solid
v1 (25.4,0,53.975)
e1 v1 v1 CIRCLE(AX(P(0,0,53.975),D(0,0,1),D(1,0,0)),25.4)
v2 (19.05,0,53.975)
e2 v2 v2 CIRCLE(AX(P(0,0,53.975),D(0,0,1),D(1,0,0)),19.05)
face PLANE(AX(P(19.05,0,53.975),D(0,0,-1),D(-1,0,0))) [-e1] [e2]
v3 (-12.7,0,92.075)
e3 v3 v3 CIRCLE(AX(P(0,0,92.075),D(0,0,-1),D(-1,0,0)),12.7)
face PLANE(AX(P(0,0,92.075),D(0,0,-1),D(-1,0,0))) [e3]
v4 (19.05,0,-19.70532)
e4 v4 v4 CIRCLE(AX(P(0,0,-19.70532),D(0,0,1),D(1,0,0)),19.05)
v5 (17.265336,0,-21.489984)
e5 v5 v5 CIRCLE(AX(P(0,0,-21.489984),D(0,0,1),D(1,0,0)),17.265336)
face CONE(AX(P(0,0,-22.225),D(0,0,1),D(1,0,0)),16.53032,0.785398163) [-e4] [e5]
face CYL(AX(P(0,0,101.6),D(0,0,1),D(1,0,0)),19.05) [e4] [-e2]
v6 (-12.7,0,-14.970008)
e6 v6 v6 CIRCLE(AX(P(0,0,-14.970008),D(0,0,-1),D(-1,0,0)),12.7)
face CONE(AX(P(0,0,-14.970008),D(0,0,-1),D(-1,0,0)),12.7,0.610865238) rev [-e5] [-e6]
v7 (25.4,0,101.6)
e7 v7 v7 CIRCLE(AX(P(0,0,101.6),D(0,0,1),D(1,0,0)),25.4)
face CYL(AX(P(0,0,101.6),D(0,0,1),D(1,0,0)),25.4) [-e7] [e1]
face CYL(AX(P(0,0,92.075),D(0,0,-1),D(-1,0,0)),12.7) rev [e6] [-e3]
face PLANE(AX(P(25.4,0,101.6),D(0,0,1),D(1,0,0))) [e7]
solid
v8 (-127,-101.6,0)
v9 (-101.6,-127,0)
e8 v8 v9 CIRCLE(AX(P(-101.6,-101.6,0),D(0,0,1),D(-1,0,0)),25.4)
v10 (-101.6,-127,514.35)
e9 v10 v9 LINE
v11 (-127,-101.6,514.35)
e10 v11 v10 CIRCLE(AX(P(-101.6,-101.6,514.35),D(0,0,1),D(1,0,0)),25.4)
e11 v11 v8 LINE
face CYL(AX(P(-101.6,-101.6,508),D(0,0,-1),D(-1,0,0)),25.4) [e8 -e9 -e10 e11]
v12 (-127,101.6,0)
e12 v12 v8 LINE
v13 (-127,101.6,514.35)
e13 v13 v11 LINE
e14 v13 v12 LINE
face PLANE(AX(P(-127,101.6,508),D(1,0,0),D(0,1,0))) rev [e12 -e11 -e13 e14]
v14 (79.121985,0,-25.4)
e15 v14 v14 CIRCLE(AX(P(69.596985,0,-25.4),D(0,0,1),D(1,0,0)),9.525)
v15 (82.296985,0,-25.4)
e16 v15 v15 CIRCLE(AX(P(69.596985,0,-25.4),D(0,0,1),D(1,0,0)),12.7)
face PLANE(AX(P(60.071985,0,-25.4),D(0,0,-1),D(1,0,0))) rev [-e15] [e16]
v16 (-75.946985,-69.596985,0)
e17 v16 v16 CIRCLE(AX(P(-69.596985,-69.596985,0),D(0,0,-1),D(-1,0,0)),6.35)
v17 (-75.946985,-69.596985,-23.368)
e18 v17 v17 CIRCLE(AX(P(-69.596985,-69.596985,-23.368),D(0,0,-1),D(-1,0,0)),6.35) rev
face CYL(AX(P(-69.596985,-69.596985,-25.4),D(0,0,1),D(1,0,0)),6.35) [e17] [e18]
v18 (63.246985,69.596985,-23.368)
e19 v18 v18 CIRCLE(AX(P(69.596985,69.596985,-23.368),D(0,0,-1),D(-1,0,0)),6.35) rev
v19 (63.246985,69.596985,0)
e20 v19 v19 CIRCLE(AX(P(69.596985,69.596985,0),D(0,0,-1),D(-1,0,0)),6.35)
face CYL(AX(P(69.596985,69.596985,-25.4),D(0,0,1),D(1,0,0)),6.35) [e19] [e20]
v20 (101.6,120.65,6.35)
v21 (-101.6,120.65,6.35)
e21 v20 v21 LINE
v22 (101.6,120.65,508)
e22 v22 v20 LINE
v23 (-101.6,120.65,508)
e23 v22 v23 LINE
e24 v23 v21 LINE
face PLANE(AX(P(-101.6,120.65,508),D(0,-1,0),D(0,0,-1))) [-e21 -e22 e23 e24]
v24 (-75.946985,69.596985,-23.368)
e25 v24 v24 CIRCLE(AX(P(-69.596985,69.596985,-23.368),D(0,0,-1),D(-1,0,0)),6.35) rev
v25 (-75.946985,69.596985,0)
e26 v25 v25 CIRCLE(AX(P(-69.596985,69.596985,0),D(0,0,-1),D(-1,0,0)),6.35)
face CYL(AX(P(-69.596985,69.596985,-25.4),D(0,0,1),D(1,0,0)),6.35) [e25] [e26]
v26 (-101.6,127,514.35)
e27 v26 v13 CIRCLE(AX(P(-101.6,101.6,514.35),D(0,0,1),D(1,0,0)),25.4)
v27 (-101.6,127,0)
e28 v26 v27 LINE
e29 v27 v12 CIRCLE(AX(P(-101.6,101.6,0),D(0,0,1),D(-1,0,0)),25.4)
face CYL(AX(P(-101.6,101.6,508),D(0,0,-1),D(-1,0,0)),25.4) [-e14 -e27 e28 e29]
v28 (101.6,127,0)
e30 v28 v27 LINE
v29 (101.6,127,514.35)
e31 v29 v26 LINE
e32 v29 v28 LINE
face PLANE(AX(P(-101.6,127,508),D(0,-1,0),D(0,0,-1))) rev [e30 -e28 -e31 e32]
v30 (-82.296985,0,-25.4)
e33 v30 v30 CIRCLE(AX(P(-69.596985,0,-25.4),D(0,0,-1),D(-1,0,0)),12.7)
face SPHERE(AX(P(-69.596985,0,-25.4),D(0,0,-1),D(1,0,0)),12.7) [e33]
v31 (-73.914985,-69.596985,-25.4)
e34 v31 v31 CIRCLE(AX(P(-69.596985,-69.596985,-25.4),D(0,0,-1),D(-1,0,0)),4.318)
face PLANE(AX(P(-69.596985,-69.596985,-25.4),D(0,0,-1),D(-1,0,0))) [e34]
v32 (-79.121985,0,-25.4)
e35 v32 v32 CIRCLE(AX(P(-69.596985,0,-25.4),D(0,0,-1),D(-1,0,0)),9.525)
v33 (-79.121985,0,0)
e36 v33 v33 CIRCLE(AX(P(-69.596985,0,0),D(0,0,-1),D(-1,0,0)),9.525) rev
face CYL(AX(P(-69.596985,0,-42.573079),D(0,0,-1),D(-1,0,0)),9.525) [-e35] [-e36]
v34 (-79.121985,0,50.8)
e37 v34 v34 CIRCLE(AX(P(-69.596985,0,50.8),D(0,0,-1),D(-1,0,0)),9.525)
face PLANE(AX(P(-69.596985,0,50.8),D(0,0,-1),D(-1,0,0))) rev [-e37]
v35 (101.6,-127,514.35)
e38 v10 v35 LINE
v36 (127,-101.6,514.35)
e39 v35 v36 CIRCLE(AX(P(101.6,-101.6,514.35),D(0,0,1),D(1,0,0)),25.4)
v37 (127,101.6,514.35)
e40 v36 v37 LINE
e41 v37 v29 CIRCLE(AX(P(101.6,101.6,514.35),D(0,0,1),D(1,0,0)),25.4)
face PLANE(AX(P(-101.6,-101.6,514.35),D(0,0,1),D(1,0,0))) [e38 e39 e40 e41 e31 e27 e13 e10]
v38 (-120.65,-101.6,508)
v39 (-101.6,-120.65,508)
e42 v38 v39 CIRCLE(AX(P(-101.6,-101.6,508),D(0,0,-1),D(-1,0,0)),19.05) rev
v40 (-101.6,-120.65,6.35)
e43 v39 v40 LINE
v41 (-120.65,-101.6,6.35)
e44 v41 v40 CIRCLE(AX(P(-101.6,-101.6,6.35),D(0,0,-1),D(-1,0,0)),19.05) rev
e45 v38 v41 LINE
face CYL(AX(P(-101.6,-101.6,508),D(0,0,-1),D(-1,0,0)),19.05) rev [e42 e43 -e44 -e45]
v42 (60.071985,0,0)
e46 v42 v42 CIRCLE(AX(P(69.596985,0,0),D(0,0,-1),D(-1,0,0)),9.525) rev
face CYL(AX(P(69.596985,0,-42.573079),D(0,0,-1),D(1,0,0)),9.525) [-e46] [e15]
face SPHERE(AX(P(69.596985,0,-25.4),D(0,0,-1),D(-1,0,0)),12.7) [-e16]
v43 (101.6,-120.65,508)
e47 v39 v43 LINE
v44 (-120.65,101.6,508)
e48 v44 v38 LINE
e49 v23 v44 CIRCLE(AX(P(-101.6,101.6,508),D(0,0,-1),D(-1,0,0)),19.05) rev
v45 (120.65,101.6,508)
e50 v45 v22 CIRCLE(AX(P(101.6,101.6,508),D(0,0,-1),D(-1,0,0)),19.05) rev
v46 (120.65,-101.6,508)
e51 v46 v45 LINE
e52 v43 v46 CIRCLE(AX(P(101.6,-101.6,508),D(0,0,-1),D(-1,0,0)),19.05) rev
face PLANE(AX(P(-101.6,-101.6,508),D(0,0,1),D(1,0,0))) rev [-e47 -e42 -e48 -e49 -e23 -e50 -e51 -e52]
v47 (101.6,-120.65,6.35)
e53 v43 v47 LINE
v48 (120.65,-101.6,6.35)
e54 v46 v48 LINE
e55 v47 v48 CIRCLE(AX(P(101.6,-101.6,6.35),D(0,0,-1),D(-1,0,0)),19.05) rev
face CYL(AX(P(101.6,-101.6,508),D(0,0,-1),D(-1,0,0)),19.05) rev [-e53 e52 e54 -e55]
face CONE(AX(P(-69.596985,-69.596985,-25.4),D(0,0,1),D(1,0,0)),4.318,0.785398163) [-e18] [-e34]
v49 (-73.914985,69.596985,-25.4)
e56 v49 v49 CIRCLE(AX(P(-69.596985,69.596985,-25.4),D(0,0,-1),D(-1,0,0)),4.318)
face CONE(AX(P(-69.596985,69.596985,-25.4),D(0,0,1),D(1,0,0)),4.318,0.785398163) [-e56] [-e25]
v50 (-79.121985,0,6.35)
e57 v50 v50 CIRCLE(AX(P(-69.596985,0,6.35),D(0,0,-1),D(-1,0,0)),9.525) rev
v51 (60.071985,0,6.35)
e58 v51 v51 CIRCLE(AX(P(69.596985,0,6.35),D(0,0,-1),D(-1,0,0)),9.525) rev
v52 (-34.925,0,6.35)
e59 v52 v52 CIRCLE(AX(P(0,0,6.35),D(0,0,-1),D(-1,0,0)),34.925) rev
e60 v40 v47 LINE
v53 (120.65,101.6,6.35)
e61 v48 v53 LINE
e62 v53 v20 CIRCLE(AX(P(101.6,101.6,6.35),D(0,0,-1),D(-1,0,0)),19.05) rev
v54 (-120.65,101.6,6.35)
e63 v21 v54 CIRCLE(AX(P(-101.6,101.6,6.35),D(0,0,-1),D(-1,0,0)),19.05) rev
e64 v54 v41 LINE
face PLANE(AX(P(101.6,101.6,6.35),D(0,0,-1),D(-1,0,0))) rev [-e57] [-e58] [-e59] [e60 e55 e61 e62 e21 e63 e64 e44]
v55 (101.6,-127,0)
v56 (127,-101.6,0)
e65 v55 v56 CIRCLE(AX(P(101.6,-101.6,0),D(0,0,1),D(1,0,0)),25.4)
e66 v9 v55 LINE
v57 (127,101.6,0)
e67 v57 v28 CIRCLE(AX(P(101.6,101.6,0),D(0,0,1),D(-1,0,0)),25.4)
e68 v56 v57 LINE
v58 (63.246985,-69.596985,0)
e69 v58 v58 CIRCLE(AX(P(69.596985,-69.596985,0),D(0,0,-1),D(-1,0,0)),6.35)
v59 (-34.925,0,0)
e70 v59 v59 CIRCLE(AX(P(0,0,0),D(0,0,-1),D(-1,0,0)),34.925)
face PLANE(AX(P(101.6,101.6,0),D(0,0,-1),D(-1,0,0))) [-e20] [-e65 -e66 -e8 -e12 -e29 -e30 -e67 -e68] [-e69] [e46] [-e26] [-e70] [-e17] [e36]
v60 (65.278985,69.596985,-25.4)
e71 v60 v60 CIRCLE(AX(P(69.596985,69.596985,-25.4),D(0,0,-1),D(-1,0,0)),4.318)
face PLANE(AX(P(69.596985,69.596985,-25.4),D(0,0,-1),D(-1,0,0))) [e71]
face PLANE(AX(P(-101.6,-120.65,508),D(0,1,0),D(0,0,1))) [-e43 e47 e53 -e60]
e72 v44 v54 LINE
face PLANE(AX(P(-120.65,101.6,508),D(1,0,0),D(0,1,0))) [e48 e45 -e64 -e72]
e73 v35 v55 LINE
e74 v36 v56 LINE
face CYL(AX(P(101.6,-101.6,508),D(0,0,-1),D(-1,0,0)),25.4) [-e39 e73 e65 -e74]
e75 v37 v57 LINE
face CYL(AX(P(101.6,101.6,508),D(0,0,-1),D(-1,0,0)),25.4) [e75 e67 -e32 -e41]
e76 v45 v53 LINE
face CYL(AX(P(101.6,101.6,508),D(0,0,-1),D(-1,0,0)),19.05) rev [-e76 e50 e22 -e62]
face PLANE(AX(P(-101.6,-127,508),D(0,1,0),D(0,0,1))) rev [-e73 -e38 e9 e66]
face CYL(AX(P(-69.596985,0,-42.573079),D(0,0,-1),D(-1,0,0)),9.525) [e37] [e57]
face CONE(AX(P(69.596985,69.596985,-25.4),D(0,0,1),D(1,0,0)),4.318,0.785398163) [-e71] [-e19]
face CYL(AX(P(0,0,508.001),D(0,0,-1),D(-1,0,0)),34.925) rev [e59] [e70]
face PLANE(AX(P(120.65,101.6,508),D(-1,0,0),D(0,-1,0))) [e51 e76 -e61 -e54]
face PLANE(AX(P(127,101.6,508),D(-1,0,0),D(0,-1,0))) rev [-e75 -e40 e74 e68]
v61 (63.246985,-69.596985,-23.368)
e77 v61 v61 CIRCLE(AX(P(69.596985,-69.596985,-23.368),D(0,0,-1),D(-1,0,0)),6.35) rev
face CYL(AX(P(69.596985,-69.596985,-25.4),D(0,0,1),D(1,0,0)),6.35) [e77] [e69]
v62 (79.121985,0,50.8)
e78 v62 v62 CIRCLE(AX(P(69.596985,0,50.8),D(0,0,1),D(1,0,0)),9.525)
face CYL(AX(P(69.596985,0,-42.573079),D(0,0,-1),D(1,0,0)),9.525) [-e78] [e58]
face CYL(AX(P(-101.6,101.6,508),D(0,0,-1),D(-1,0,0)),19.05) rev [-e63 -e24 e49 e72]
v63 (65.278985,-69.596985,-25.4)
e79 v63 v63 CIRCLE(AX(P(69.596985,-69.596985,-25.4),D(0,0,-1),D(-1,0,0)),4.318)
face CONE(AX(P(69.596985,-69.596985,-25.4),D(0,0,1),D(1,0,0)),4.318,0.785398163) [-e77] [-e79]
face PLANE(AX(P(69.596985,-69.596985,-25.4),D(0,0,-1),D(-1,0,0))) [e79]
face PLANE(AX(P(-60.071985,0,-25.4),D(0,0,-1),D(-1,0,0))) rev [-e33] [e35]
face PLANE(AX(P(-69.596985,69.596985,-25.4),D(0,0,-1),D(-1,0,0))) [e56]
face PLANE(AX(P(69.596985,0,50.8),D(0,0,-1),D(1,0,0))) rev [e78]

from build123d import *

# Parameters (mm, degrees)
BOSS_EXTRUDE1_DEPTH = 508
SHELL1_T            = -6.35
CUT_EXTRUDE1_REACH  = 540.815
SKETCH3_R           = 34.925
SKETCH5_R           = 6.35
BOSS_EXTRUDE2_DEPTH = 25.4
CHAMFER1_SIZE       = 2.032
SKETCH10_R          = 12.7
CUT_EXTRUDE2_DEPTH  = 114.3
CHAMFER2_SIZE       = 5.08
CHAMFER2_SIZE2      = 7.254991874
BOSS_EXTRUDE3_DEPTH = 6.35


# Read off the part's stored shape, not the designer's step: 1-1/2-6 Machine Threads Stud1
with BuildPart() as part:
    # Sketch2 → Boss-Extrude1 (new body)
    with BuildSketch(Plane.XY):
        with BuildLine():
            Line((-101.6, 127), (101.6, 127))
            ThreePointArc((101.6, 127), (119.560512242, 119.560512242), (127, 101.6))
            Line((127, 101.6), (127, -101.6))
            ThreePointArc((127, -101.6), (119.560512242, -119.560512242), (101.6, -127))
            Line((101.6, -127), (-101.6, -127))
            ThreePointArc((-101.6, -127), (-119.560512242, -119.560512242), (-127, -101.6))
            Line((-127, -101.6), (-127, 101.6))
            ThreePointArc((-127, 101.6), (-119.560512242, 119.560512242), (-101.6, 127))
        make_face()
    extrude(amount=BOSS_EXTRUDE1_DEPTH)

    # Shell1
    shell1_openings = [part.faces().sort_by_distance(p)[0] for p in [
        (0, 0, 508),
    ]]
    offset(amount=SHELL1_T, openings=shell1_openings, kind=Kind.INTERSECTION)

    # Sketch3 → Cut-Extrude1 (cut, up to next)
    with BuildSketch(Plane(origin=(0, 0, 0), x_dir=(-1, 0, 0), z_dir=(0, 0, -1)), mode=Mode.PRIVATE) as cut_extrude1_sk1:
        Circle(SKETCH3_R)
    cut_extrude1_tool1 = extrude(cut_extrude1_sk1.sketch, amount=-CUT_EXTRUDE1_REACH, mode=Mode.PRIVATE) & part.part
    add(cut_extrude1_tool1.solids().sort_by_distance((0, 0, 0))[0], mode=Mode.SUBTRACT)

    # Sketch5 → Boss-Extrude2 (add)
    with BuildSketch(Plane(origin=(0, 0, 0), x_dir=(-1, 0, 0), z_dir=(0, 0, -1))):
        with Locations((-69.596984938, 69.596984938)):
            Circle(SKETCH5_R)
        with Locations((69.596984938, 69.596984938)):
            Circle(SKETCH5_R)
        with Locations((69.596984938, -69.596984938)):
            Circle(SKETCH5_R)
        with Locations((-69.596984938, -69.596984938)):
            Circle(SKETCH5_R)
    extrude(amount=BOSS_EXTRUDE2_DEPTH)

    # Chamfer1
    chamfer1_edges = [part.edges().sort_by_distance(p)[0] for p in [
        (75.946984938, -69.596984938, -25.4),
        (-63.246984938, -69.596984938, -25.4),
        (-63.246984938, 69.596984938, -25.4),
        (75.946984938, 69.596984938, -25.4),
    ]]
    chamfer(chamfer1_edges, length=CHAMFER1_SIZE)

    # Sketch7 → Revolve3 (revolve)
    with BuildSketch(Plane(origin=(0, 0, 0), x_dir=(1, 0, 0), z_dir=(0, 1, 0)), mode=Mode.PRIVATE) as revolve3_sk:
        with BuildLine():
            Line((-60.071984938, 25.4), (-60.071984938, -50.8))
            Line((-60.071984938, -50.8), (-69.596984938, -50.8))
            Line((-69.596984938, -50.8), (-69.596984938, 38.1))
            ThreePointArc((-69.596984938, 38.1), (-60.616728817, 34.380256121), (-56.896984938, 25.4))
            Line((-56.896984938, 25.4), (-60.071984938, 25.4))
        make_face()
    revolve3 = revolve(revolve3_sk.sketch.rotate(Axis((-69.596984938, 0, -42.573078711), (0, 0, 1)), 180), axis=Axis((-69.596984938, 0, -42.573078711), (0, 0, 1)))

    # Mirror1: Revolve3 across plane
    add(revolve3.mirror(Plane(origin=(0, 0, 0), x_dir=(0, 0, 1), z_dir=(1, 0, 0))))

    # Sketch12 → Boss-Extrude3 (add)
    with BuildSketch(Plane.XY.offset(508)):
        with BuildLine():
            Line((-101.6, -127), (101.6, -127))
            ThreePointArc((101.6, -127), (119.560512242, -119.560512242), (127, -101.6))
            Line((127, -101.6), (127, 101.6))
            ThreePointArc((127, 101.6), (119.560512242, 119.560512242), (101.6, 127))
            Line((101.6, 127), (-101.6, 127))
            ThreePointArc((-101.6, 127), (-119.560512242, 119.560512242), (-127, 101.6))
            Line((-127, 101.6), (-127, -101.6))
            ThreePointArc((-127, -101.6), (-119.560512242, -119.560512242), (-101.6, -127))
        make_face()
    extrude(amount=BOSS_EXTRUDE3_DEPTH)


with BuildPart() as body_2:
    # Sketch9 → Revolve4 (revolve)
    with BuildSketch(Plane(origin=(0, 0, 0), x_dir=(1, 0, 0), z_dir=(0, 1, 0))):
        Polygon((0, 22.225), (19.05, 22.225), (19.05, -53.975), (25.4, -53.975), (25.4, -101.6), (0, -101.6), align=None)
    revolve(axis=Axis((0, 0, 101.6), (0, 0, -1)))

    # Sketch10 → Cut-Extrude2 (cut)
    with BuildSketch(Plane(origin=(0, 0, -22.225), x_dir=(-1, 0, 0), z_dir=(0, 0, -1))):
        Circle(SKETCH10_R)
    extrude(amount=-CUT_EXTRUDE2_DEPTH, mode=Mode.SUBTRACT)

    # Chamfer2
    chamfer2_edges = [body_2.edges().sort_by_distance(p)[0] for p in [
        (12.7, 0, -22.225),
    ]]
    chamfer2_side = [body_2.faces().sort_by_distance(p)[0] for p in [
        (-18.511184633, 0, -22.225),
    ]]
    chamfer(chamfer2_edges, length=CHAMFER2_SIZE, length2=CHAMFER2_SIZE2, reference=chamfer2_side[0])

    # 1-1/2-6 Machine Threads Stud1 outline → 1-1/2-6 Machine Threads Stud1 (revolve, cut)
    with BuildSketch(Plane.XZ):
        Polygon((17.265336151, -21.489983849), (17.265336151, -22.225), (19.05, -22.225), (19.05, -19.70532), align=None)
    revolve(axis=Axis((0, 0, 0), (0, 0, 1)), mode=Mode.SUBTRACT)


solid = Compound([part.part, body_2.part])
